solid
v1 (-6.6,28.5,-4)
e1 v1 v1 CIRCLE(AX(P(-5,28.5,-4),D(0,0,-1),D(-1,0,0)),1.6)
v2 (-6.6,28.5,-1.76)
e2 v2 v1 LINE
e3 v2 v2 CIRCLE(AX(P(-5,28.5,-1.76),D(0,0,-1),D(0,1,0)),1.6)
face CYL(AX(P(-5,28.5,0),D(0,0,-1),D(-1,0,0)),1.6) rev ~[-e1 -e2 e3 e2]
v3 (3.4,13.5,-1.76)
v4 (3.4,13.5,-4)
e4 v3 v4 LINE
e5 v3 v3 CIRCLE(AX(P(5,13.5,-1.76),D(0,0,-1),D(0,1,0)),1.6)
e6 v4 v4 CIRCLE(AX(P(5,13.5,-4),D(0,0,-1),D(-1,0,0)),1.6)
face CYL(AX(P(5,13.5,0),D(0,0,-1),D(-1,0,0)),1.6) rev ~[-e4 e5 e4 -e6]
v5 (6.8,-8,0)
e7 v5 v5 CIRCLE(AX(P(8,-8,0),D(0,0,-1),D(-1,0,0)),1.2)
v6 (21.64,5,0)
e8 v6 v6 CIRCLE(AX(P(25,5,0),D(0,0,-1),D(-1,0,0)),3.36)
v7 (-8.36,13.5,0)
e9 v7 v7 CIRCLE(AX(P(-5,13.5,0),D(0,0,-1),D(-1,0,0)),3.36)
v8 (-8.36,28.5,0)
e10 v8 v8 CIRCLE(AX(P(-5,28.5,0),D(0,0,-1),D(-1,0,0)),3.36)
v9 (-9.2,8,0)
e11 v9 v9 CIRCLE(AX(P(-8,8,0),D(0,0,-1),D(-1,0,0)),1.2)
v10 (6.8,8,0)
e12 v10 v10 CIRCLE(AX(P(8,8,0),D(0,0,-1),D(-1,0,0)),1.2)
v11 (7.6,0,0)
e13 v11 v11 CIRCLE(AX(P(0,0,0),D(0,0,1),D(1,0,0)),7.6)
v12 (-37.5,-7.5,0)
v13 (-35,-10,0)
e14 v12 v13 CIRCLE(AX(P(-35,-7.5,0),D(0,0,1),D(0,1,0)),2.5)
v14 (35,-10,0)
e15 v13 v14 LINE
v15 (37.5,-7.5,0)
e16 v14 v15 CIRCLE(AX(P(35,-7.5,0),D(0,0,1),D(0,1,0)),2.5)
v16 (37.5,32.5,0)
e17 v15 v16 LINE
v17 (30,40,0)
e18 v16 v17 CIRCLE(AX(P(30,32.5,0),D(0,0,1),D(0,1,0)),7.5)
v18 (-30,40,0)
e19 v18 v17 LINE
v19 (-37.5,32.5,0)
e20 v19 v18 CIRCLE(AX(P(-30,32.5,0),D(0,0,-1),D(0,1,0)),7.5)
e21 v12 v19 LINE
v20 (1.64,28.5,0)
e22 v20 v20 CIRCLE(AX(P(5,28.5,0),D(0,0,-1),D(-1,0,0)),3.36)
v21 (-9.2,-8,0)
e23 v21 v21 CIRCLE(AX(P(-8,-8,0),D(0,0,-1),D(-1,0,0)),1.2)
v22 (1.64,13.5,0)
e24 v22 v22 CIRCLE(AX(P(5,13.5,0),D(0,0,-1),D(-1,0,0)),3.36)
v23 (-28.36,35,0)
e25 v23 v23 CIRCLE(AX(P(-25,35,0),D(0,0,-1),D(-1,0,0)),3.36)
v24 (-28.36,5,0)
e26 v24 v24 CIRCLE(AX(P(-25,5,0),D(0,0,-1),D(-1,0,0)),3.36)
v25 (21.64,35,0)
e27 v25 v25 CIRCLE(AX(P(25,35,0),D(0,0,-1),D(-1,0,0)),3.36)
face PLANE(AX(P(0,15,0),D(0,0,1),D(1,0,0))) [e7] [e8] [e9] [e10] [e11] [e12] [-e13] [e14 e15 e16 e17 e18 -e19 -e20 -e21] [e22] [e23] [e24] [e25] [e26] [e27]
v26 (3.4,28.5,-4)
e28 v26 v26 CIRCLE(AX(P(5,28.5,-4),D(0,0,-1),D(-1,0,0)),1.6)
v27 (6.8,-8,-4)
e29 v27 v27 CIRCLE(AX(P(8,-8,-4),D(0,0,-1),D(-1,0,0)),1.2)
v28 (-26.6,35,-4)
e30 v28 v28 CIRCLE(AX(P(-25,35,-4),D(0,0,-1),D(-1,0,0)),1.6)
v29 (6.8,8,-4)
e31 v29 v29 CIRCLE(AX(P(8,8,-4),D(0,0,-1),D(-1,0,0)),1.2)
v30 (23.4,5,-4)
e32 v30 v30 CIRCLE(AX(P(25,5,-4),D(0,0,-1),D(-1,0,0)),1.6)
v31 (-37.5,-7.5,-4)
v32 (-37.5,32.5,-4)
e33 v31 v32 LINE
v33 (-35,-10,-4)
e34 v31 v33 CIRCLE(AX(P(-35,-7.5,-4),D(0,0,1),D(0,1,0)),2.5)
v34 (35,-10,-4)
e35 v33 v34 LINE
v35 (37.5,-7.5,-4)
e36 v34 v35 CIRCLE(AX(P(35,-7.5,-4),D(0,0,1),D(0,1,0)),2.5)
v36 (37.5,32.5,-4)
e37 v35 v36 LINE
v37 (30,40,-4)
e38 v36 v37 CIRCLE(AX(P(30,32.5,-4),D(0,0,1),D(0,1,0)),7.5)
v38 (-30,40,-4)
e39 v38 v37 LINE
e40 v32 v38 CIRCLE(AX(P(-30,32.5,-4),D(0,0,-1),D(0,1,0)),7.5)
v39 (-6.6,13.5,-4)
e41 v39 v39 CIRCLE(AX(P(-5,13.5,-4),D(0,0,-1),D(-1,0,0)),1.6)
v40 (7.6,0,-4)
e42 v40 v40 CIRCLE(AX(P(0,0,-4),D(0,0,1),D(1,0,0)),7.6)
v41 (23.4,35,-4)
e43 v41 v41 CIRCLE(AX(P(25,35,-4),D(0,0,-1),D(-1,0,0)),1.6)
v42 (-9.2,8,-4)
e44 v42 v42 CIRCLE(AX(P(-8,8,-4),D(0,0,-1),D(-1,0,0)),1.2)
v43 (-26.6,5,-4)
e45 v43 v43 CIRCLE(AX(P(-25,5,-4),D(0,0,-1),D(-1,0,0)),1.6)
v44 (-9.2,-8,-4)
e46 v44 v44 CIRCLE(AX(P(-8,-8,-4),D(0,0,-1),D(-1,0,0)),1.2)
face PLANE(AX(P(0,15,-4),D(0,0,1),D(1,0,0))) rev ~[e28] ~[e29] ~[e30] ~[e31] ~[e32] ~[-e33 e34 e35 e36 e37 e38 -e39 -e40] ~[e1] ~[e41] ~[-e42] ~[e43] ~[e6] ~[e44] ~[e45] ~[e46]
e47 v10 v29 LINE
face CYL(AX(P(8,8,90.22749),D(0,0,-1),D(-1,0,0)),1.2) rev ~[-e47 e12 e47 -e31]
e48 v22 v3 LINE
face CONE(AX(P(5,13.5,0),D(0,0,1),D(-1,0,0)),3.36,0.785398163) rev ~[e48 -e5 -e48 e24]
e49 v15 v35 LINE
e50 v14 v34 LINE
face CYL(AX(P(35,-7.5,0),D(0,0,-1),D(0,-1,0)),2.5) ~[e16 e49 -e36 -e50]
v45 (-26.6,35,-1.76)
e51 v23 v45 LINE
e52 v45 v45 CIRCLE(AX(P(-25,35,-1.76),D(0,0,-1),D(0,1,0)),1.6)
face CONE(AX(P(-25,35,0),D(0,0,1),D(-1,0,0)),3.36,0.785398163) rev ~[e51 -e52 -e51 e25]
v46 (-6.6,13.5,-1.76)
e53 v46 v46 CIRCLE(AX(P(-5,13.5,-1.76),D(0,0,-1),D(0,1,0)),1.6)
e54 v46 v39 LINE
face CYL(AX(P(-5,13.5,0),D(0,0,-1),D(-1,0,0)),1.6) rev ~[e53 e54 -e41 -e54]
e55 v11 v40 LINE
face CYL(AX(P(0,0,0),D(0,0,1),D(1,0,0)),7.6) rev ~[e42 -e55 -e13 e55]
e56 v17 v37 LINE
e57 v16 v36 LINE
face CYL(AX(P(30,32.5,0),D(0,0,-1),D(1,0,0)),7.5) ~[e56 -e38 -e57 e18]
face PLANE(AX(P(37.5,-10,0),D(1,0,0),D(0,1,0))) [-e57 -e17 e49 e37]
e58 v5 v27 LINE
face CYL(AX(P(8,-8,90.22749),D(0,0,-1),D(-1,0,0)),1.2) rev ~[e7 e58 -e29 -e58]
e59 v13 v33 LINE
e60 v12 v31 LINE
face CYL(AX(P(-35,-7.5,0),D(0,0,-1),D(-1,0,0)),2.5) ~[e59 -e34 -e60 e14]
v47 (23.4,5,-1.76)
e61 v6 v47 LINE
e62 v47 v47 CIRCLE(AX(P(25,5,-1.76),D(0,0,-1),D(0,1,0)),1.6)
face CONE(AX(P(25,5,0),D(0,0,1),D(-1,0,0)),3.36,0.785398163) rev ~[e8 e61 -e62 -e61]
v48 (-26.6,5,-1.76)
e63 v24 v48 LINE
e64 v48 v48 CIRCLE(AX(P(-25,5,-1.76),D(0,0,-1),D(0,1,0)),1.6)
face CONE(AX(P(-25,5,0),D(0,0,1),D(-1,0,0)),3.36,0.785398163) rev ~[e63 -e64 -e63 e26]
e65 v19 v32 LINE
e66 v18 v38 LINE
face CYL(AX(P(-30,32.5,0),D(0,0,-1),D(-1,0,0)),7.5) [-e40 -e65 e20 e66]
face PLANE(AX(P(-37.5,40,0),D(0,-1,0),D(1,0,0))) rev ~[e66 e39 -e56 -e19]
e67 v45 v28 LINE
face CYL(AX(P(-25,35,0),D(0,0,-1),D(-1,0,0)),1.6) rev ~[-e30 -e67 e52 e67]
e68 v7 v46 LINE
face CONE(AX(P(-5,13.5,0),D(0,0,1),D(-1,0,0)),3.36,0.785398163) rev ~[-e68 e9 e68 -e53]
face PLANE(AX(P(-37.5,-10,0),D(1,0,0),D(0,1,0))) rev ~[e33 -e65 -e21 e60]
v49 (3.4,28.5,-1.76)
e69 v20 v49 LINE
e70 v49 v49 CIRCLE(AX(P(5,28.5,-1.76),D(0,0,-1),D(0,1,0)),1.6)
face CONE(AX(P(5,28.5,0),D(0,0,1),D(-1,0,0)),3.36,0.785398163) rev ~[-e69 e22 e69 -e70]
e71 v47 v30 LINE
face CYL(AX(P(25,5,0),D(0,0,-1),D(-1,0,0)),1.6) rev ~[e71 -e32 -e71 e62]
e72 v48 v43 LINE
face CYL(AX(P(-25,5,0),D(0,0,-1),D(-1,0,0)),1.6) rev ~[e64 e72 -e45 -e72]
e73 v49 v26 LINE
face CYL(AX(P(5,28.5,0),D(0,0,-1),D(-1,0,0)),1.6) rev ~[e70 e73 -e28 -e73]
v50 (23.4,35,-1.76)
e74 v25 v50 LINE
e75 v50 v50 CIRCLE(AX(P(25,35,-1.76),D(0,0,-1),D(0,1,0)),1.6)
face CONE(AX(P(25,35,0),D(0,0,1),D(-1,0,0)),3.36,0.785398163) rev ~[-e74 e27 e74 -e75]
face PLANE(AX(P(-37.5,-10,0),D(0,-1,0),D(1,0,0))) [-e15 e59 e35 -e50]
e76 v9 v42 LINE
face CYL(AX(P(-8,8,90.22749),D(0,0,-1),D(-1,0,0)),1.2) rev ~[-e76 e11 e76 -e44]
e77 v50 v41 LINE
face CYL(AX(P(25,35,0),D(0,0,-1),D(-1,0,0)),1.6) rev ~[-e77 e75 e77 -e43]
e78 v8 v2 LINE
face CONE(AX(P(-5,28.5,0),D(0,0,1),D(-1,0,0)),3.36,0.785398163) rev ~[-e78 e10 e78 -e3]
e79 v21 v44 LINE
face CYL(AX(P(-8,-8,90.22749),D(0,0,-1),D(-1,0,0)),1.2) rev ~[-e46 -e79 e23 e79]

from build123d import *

# Parameters (mm, degrees)
F0_W           = 75
F0_H           = 50
F0_R           = 7.6
F1_DEPTH       = 4
F2_D           = 2.4
F3_D           = 3.2
F3_CSINK_D     = 6.72
F3_CSINK_ANGLE = 90
F4_R           = 7.5
F5_R           = 2.5


# Not quite as in the source:
# - a feature names something its author has since deleted; it is built from what else it names


with BuildPart() as f1:
    # F0 (on Top) → F1 (new body)
    with BuildSketch(Plane.XY):
        with Locations((0, 15)):
            Rectangle(F0_W, F0_H)
        Circle(F0_R, mode=Mode.SUBTRACT)
    extrude(amount=-F1_DEPTH)

    # F2 (through all)
    with Locations(Plane.XY):
        with Locations((-8, 8), (8, 8), (8, -8), (-8, -8)):
            Hole(F2_D / 2)

    # F3 (through all)
    with Locations(Plane.XY):
        with Locations((-25, 5), (25, 5), (-5, 28.5), (5, 28.5), (5, 13.5), (-5, 13.5), (-25, 35), (25, 35)):
            CounterSinkHole(F3_D / 2, F3_CSINK_D / 2, counter_sink_angle=F3_CSINK_ANGLE)

    # F4
    f4_edges = [f1.edges().sort_by_distance(p)[0] for p in [
        (-37.5, 40, -2),
        (37.5, 40, -2),
    ]]
    fillet(f4_edges, radius=F4_R)

    # F5
    f5_edges = [f1.edges().sort_by_distance(p)[0] for p in [
        (-37.5, -10, -2),
        (37.5, -10, -2),
    ]]
    fillet(f5_edges, radius=F5_R)


solid = f1.part
